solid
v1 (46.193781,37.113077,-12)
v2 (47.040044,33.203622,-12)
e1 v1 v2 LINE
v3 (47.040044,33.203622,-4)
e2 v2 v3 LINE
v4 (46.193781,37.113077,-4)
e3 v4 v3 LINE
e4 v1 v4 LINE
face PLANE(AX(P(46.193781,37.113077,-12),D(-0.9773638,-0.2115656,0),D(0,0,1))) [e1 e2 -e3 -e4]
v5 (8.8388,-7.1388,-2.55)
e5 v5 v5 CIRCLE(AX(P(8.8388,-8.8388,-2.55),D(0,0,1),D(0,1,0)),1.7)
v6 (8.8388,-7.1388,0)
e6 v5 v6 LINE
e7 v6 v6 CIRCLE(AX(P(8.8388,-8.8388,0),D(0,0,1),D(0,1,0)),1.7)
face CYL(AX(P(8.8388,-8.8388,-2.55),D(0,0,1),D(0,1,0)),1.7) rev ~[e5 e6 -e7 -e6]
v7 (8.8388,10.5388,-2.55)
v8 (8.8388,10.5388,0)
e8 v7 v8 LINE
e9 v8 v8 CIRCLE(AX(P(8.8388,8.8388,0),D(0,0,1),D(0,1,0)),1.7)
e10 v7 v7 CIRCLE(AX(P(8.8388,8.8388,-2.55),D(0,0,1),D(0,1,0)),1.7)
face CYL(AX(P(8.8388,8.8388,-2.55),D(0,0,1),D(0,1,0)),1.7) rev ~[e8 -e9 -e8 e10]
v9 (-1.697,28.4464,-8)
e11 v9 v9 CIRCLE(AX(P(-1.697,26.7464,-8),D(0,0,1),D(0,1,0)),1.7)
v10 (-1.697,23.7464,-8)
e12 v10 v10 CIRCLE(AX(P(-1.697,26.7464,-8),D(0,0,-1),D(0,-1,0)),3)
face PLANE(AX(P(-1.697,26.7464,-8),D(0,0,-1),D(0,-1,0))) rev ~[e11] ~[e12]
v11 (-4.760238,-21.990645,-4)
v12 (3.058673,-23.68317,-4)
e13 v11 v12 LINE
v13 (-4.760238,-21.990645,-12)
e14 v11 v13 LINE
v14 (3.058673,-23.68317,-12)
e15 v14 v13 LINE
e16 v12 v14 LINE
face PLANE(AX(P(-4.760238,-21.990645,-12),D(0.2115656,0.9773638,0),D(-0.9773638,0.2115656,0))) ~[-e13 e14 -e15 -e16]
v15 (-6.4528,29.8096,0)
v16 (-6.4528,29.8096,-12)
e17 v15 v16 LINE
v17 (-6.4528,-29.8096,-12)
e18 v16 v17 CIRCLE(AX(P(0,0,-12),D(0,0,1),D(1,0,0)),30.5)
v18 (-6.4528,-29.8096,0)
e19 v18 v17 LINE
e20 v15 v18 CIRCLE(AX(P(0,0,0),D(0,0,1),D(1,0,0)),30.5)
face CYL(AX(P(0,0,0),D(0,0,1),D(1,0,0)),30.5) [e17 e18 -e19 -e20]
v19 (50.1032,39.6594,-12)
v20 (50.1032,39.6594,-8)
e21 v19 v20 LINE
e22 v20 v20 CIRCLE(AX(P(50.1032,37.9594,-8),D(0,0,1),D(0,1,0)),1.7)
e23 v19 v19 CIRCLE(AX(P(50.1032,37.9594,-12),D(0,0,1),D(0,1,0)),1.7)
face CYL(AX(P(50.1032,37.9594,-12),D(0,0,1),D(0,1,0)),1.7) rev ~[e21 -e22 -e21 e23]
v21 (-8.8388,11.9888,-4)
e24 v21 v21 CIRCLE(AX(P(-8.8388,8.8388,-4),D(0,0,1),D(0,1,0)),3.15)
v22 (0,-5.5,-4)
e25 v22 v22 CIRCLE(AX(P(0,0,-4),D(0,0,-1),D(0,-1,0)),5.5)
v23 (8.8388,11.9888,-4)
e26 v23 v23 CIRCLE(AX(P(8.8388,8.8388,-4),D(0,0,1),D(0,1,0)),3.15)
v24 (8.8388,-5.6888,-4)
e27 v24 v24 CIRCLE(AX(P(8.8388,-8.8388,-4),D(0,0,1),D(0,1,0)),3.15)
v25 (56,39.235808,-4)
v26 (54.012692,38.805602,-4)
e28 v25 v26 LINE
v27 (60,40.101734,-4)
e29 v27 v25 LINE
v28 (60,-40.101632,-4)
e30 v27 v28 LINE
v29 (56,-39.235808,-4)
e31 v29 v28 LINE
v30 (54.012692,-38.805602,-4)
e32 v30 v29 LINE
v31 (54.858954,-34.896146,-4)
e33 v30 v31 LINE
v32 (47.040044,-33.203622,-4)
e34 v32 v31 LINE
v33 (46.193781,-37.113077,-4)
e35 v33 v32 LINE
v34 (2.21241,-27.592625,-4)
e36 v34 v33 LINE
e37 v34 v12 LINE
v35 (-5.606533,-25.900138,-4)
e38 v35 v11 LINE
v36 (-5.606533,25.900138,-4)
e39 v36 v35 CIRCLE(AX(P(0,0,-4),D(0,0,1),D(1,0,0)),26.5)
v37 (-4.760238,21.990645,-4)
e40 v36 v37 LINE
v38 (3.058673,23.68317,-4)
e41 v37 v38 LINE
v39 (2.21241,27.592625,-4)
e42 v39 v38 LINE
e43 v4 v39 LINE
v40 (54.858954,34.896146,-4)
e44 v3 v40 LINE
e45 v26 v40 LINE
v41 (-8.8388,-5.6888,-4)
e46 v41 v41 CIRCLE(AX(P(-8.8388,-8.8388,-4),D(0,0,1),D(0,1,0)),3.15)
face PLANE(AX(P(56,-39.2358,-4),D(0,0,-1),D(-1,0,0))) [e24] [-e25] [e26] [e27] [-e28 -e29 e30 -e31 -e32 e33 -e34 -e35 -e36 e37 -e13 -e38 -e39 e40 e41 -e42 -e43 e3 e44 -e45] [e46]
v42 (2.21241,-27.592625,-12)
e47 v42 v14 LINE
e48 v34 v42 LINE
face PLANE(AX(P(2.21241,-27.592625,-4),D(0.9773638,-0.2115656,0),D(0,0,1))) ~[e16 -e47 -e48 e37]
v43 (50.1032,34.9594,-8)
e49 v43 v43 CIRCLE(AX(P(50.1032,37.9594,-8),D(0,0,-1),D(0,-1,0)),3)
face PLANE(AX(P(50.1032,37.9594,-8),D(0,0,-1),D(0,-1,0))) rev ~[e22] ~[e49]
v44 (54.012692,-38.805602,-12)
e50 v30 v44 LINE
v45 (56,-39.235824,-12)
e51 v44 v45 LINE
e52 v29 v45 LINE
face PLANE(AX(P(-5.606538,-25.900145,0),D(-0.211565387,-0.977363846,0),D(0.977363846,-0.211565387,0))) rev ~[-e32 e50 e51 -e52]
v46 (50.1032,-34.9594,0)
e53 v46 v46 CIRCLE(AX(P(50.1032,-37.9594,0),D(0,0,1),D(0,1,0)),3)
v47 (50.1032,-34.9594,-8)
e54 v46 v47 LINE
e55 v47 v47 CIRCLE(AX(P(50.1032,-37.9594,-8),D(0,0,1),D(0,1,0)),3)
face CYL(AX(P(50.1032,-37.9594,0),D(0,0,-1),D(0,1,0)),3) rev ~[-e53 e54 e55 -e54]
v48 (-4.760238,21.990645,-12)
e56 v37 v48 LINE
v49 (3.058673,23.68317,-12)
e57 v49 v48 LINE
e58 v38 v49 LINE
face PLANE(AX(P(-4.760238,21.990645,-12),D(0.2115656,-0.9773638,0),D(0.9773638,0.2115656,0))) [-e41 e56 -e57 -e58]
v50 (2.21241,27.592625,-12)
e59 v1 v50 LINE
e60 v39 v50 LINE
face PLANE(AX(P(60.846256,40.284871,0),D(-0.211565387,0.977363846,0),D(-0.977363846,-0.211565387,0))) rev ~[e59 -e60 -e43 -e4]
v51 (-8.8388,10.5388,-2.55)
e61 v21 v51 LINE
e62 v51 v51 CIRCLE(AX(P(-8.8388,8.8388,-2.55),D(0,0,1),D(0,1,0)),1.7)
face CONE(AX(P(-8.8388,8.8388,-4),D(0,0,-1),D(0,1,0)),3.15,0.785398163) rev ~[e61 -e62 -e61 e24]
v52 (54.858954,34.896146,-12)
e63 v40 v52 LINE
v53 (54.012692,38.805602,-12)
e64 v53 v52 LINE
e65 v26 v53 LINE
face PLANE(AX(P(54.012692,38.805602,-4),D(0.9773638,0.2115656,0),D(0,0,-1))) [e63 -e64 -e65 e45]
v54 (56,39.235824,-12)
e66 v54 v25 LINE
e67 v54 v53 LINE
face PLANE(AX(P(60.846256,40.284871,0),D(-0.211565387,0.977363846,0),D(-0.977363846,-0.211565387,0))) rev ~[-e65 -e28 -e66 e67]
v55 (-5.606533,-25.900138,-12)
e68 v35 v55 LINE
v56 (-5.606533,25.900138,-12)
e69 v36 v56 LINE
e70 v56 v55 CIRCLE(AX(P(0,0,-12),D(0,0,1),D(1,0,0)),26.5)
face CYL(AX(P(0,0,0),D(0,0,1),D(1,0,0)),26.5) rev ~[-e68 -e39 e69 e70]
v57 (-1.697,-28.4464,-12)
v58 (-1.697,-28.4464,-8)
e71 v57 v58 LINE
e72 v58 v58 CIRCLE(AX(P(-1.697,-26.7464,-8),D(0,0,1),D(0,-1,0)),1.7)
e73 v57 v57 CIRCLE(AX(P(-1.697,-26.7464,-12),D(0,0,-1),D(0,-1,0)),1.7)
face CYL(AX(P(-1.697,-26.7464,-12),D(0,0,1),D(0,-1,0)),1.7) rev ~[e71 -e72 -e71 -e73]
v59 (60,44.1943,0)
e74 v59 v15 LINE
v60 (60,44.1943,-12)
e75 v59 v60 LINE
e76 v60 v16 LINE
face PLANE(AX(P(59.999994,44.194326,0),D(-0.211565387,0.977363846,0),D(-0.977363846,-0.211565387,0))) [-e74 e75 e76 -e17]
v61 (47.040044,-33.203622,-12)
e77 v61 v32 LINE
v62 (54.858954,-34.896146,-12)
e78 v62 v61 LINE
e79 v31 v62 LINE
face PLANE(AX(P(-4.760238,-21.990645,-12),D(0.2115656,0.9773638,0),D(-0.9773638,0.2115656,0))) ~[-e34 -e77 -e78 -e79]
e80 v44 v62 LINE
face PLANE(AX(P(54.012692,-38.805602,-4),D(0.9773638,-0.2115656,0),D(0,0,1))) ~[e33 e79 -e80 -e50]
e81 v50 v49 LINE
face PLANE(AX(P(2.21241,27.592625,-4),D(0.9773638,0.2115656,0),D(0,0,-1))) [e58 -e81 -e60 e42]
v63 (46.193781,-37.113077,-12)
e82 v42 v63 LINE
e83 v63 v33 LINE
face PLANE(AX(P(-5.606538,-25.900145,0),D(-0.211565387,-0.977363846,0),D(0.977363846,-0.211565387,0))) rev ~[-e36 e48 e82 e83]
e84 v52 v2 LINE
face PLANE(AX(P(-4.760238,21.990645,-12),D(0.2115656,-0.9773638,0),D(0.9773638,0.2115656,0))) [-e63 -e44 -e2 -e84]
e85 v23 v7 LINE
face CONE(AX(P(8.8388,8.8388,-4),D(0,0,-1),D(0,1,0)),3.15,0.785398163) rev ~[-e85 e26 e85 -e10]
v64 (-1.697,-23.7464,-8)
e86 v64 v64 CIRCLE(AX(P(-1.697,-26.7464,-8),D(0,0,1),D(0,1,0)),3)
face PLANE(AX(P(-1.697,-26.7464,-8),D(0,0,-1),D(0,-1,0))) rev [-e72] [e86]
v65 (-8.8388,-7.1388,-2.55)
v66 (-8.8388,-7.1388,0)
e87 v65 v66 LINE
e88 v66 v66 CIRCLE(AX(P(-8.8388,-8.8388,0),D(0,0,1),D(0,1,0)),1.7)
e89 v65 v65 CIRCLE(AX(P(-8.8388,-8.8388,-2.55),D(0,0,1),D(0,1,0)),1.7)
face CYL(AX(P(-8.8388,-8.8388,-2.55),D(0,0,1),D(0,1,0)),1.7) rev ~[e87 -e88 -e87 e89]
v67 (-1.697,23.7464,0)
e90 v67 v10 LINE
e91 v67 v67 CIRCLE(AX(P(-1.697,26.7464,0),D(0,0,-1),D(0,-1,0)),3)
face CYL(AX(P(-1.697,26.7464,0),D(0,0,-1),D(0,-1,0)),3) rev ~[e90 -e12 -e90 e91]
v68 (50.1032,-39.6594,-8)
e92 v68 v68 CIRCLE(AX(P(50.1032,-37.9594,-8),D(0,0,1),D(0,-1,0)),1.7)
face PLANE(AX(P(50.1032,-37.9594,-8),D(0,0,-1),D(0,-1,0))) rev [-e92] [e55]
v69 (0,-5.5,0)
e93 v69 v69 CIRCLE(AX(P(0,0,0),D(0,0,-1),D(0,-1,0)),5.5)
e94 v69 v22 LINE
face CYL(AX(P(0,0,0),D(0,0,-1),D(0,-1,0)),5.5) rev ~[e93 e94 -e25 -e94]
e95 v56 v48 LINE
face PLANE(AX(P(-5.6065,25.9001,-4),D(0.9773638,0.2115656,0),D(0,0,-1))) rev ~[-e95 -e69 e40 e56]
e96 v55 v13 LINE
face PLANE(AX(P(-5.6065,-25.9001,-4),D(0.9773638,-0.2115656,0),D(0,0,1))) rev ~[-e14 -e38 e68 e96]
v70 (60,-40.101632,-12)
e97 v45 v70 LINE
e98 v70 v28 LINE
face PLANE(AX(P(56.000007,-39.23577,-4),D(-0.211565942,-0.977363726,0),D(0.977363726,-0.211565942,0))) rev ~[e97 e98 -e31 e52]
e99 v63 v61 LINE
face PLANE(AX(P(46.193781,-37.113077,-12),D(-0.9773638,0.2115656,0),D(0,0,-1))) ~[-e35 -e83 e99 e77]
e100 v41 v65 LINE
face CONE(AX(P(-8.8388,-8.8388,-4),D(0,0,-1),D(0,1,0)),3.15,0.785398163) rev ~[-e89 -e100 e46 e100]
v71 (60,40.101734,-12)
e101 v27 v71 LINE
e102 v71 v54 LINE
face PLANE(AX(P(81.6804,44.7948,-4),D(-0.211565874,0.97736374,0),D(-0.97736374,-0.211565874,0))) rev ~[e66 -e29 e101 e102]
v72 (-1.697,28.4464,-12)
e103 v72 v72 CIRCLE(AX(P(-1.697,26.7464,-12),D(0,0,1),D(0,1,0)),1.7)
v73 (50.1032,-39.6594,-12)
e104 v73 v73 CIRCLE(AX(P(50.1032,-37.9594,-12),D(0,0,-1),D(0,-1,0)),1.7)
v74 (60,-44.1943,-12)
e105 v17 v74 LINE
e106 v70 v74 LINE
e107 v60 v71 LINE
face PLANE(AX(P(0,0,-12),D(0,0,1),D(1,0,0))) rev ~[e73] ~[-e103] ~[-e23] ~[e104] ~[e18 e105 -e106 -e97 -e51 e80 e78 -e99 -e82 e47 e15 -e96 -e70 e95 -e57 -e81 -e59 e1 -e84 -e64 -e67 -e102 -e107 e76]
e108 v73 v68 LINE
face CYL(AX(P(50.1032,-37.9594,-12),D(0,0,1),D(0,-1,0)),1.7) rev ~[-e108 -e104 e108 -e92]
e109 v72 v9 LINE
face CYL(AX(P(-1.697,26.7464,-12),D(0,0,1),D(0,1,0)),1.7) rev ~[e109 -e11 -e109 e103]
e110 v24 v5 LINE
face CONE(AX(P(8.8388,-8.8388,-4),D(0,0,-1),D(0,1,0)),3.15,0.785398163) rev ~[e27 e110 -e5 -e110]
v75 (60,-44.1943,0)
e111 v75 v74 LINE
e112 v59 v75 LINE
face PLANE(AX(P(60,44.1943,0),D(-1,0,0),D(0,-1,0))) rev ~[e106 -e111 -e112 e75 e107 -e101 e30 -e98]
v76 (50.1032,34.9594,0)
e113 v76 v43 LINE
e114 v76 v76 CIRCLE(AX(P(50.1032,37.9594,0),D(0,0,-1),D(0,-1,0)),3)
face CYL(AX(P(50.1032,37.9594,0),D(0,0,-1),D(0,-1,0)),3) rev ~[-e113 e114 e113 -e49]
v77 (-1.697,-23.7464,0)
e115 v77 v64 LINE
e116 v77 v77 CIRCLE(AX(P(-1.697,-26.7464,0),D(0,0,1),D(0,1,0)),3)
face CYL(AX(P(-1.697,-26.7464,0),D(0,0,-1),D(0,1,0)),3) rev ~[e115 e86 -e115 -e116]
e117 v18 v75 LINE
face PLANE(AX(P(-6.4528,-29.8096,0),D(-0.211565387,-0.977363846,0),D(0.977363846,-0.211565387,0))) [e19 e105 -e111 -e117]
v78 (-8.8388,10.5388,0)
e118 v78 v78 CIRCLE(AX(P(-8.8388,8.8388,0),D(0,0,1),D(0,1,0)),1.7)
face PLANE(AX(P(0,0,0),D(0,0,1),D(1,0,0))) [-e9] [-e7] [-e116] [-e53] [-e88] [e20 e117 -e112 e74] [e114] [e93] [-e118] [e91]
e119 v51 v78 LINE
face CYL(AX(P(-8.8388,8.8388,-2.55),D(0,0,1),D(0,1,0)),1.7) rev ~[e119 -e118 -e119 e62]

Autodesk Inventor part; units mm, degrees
ref_plane "YZ Plane" through (0, 0, 0) normal (1, 0, 0) x (0, 1, 0)
ref_plane "XZ Plane" through (0, 0, 0) normal (0, 1, 0) x (-1, 0, 0)
ref_plane "XY Plane" through (0, 0, 0) normal (0, 0, 1) x (1, 0, 0)
sketch "Sketch1" plane through (0, 0, 0) normal (0, 0, 1) x (1, 0, 0)
  circle A0 centre (0, 0) radius 30.5
  circle A1 centre (141.8, 0) radius 60.5
  line L0 (129.0003, 59.1305) -> (-6.4528, 29.8096)
  line L1 (-6.4528, -29.8096) -> (129.0003, -59.1305)
  line L2 (60, 44.1943) -> (60, -44.1943)
  dimension "d0" = 61
  dimension "d1" = 121
  dimension "d2" = 141.8
  dimension "d3" = 60
extrude "Extrusion1" add sketch "Sketch1" against normal blind 12 contours A0 | A0 L0 L2 L1
shell "Shell1" thickness 4 removed faces 1 at (37.8491, -9.9365, -12)
sketch "Sketch6" plane through (0, 0, 0) normal (0, 0, 1) x (1, 0, 0)
  point P0 (0, 0)
  point P1 (0, 0)
hole "Hole3" at (0, 0, 0) direction (0, 0, -1) diameter 11 end through all
sketch "Sketch5" plane through (56, -39.2358, -4) normal (0, 0, -1) x (-1, 0, 0)
  line L0 (64.8388, 48.0747) -> (47.1612, 48.0747)
  line L1 (47.1612, 48.0747) -> (47.1612, 30.397)
  line L2 (47.1612, 30.397) -> (64.8388, 30.397)
  line L3 (64.8388, 30.397) -> (64.8388, 48.0747)
  line L4 (64.8388, 48.0747) -> (47.1612, 30.397) construction
  line L5 (47.1612, 48.0747) -> (64.8388, 30.397) construction
  point P0 (56, 39.2358)
  dimension "d16" = 25
hole "Hole2" at (8.8388, -8.8388, -4) at (-8.8388, -8.8388, -4) at (-8.8388, 8.8388, -4) at (8.8388, 8.8388, -4) direction (0, 0, 1) diameter 3.4 end through all countersink diameter 6.3 countersink angle 90 clearance for "Countersunk Flat Head Screw ISO 2009/7046" size "M3" standard "ISO"
sketch "Sketch7" plane through (56, -39.2358, -4) normal (0, 0, -1) x (-1, 0, 0)
  line L0 (26.9325, 5.83) -> (-25.6804, -5.5589)
  line L1 (-25.6804, -5.5589) -> (-25.6804, 84.0306)
  line L2 (-25.6804, 84.0306) -> (28.864, 72.2236)
  line L3 (28.864, 72.2236) -> (24.7276, 5.3527)
  line L4 (61.6065, 13.3357) -> (0, 0) projected
  line L5 (0, 78.4716) -> (61.6065, 65.136) projected
  point P0 (56, 39.2358)
extrude "Extrusion2" cut sketch "Sketch7" along normal through all
sketch "Sketch8" plane through (-5.6065, 25.9001, -12) normal (0.2115656, -0.9773638, 0) x (0.9773638, 0.2115656, 0)
  line L0 (0, 8) -> (0, 0) projected
  line L1 (67.126, 0) -> (0, 0) projected
  line L2 (0, 8) -> (8, 8)
  line L3 (8, 8) -> (8, 0)
  line L4 (8, 0) -> (0, 0)
  line L5 (0, 0) -> (0, 8)
  line L6 (53, 8) -> (61, 8)
  line L7 (61, 8) -> (61, 0)
  line L8 (61, 0) -> (53, 0)
  line L9 (53, 0) -> (53, 8)
  point P0 (0, 12)
  dimension "d33" = 8
  dimension "d34" = 8
  dimension "d35" = 45
extrude "Extrusion3" add sketch "Sketch8" along normal blind 4
sketch "Sketch9" plane through (0, 0, -12) normal (0, 0, -1) x (-1, 0, 0)
  line L0 (4.7602, 21.9907) -> (-3.0587, 23.6832) projected
  line L1 (-60, 44.1943) -> (6.4528, 29.8096) projected
  line L2 (-46.1938, 37.1131) -> (-47.0401, 33.2037) projected
  line L3 (-47.0401, 33.2037) -> (-53.1727, 42.6863)
  line L4 (-1.3662, 31.5021) -> (4.7602, 21.9907)
  line L5 (-3.0587, 23.6832) -> (6.4528, 29.8096)
  line L6 (-47.0401, 33.2037) -> (-54.859, 34.8962) projected
  line L7 (-54.859, 34.8962) -> (-45.3475, 41.0226)
  point P0 (0, 0)
  point P1 (-50.1032, 37.9594)
  point P2 (1.697, 26.7464)
hole "Hole4" at (50.1032, 37.9594, -12) at (-1.697, 26.7464, -12) direction (0, 0, 1) diameter 3.4 end through all clearance for "Countersunk Flat Head Screw ISO 2009/7046" size "M3" standard "ISO"
sketch "Sketch10" plane through (0, 0, 0) normal (0, 0, 1) x (1, 0, 0)
  circle A0 centre (50.1032, 37.9594) radius 1.7 projected
  circle A1 centre (-1.697, 26.7464) radius 1.7 projected
  point P0 (0, 0)
hole "Hole5" at (50.1032, 37.9594, 0) at (-1.697, 26.7464, 0) direction (0, 0, -1) diameter 6 depth 8
mirror "Mirror1" about plane through (0, 0, 0) normal (0, 1, 0) of "Extrusion3", "Hole4", "Hole5"
equation "\"d34\" = d33"
properties part number "J1-sketch"
